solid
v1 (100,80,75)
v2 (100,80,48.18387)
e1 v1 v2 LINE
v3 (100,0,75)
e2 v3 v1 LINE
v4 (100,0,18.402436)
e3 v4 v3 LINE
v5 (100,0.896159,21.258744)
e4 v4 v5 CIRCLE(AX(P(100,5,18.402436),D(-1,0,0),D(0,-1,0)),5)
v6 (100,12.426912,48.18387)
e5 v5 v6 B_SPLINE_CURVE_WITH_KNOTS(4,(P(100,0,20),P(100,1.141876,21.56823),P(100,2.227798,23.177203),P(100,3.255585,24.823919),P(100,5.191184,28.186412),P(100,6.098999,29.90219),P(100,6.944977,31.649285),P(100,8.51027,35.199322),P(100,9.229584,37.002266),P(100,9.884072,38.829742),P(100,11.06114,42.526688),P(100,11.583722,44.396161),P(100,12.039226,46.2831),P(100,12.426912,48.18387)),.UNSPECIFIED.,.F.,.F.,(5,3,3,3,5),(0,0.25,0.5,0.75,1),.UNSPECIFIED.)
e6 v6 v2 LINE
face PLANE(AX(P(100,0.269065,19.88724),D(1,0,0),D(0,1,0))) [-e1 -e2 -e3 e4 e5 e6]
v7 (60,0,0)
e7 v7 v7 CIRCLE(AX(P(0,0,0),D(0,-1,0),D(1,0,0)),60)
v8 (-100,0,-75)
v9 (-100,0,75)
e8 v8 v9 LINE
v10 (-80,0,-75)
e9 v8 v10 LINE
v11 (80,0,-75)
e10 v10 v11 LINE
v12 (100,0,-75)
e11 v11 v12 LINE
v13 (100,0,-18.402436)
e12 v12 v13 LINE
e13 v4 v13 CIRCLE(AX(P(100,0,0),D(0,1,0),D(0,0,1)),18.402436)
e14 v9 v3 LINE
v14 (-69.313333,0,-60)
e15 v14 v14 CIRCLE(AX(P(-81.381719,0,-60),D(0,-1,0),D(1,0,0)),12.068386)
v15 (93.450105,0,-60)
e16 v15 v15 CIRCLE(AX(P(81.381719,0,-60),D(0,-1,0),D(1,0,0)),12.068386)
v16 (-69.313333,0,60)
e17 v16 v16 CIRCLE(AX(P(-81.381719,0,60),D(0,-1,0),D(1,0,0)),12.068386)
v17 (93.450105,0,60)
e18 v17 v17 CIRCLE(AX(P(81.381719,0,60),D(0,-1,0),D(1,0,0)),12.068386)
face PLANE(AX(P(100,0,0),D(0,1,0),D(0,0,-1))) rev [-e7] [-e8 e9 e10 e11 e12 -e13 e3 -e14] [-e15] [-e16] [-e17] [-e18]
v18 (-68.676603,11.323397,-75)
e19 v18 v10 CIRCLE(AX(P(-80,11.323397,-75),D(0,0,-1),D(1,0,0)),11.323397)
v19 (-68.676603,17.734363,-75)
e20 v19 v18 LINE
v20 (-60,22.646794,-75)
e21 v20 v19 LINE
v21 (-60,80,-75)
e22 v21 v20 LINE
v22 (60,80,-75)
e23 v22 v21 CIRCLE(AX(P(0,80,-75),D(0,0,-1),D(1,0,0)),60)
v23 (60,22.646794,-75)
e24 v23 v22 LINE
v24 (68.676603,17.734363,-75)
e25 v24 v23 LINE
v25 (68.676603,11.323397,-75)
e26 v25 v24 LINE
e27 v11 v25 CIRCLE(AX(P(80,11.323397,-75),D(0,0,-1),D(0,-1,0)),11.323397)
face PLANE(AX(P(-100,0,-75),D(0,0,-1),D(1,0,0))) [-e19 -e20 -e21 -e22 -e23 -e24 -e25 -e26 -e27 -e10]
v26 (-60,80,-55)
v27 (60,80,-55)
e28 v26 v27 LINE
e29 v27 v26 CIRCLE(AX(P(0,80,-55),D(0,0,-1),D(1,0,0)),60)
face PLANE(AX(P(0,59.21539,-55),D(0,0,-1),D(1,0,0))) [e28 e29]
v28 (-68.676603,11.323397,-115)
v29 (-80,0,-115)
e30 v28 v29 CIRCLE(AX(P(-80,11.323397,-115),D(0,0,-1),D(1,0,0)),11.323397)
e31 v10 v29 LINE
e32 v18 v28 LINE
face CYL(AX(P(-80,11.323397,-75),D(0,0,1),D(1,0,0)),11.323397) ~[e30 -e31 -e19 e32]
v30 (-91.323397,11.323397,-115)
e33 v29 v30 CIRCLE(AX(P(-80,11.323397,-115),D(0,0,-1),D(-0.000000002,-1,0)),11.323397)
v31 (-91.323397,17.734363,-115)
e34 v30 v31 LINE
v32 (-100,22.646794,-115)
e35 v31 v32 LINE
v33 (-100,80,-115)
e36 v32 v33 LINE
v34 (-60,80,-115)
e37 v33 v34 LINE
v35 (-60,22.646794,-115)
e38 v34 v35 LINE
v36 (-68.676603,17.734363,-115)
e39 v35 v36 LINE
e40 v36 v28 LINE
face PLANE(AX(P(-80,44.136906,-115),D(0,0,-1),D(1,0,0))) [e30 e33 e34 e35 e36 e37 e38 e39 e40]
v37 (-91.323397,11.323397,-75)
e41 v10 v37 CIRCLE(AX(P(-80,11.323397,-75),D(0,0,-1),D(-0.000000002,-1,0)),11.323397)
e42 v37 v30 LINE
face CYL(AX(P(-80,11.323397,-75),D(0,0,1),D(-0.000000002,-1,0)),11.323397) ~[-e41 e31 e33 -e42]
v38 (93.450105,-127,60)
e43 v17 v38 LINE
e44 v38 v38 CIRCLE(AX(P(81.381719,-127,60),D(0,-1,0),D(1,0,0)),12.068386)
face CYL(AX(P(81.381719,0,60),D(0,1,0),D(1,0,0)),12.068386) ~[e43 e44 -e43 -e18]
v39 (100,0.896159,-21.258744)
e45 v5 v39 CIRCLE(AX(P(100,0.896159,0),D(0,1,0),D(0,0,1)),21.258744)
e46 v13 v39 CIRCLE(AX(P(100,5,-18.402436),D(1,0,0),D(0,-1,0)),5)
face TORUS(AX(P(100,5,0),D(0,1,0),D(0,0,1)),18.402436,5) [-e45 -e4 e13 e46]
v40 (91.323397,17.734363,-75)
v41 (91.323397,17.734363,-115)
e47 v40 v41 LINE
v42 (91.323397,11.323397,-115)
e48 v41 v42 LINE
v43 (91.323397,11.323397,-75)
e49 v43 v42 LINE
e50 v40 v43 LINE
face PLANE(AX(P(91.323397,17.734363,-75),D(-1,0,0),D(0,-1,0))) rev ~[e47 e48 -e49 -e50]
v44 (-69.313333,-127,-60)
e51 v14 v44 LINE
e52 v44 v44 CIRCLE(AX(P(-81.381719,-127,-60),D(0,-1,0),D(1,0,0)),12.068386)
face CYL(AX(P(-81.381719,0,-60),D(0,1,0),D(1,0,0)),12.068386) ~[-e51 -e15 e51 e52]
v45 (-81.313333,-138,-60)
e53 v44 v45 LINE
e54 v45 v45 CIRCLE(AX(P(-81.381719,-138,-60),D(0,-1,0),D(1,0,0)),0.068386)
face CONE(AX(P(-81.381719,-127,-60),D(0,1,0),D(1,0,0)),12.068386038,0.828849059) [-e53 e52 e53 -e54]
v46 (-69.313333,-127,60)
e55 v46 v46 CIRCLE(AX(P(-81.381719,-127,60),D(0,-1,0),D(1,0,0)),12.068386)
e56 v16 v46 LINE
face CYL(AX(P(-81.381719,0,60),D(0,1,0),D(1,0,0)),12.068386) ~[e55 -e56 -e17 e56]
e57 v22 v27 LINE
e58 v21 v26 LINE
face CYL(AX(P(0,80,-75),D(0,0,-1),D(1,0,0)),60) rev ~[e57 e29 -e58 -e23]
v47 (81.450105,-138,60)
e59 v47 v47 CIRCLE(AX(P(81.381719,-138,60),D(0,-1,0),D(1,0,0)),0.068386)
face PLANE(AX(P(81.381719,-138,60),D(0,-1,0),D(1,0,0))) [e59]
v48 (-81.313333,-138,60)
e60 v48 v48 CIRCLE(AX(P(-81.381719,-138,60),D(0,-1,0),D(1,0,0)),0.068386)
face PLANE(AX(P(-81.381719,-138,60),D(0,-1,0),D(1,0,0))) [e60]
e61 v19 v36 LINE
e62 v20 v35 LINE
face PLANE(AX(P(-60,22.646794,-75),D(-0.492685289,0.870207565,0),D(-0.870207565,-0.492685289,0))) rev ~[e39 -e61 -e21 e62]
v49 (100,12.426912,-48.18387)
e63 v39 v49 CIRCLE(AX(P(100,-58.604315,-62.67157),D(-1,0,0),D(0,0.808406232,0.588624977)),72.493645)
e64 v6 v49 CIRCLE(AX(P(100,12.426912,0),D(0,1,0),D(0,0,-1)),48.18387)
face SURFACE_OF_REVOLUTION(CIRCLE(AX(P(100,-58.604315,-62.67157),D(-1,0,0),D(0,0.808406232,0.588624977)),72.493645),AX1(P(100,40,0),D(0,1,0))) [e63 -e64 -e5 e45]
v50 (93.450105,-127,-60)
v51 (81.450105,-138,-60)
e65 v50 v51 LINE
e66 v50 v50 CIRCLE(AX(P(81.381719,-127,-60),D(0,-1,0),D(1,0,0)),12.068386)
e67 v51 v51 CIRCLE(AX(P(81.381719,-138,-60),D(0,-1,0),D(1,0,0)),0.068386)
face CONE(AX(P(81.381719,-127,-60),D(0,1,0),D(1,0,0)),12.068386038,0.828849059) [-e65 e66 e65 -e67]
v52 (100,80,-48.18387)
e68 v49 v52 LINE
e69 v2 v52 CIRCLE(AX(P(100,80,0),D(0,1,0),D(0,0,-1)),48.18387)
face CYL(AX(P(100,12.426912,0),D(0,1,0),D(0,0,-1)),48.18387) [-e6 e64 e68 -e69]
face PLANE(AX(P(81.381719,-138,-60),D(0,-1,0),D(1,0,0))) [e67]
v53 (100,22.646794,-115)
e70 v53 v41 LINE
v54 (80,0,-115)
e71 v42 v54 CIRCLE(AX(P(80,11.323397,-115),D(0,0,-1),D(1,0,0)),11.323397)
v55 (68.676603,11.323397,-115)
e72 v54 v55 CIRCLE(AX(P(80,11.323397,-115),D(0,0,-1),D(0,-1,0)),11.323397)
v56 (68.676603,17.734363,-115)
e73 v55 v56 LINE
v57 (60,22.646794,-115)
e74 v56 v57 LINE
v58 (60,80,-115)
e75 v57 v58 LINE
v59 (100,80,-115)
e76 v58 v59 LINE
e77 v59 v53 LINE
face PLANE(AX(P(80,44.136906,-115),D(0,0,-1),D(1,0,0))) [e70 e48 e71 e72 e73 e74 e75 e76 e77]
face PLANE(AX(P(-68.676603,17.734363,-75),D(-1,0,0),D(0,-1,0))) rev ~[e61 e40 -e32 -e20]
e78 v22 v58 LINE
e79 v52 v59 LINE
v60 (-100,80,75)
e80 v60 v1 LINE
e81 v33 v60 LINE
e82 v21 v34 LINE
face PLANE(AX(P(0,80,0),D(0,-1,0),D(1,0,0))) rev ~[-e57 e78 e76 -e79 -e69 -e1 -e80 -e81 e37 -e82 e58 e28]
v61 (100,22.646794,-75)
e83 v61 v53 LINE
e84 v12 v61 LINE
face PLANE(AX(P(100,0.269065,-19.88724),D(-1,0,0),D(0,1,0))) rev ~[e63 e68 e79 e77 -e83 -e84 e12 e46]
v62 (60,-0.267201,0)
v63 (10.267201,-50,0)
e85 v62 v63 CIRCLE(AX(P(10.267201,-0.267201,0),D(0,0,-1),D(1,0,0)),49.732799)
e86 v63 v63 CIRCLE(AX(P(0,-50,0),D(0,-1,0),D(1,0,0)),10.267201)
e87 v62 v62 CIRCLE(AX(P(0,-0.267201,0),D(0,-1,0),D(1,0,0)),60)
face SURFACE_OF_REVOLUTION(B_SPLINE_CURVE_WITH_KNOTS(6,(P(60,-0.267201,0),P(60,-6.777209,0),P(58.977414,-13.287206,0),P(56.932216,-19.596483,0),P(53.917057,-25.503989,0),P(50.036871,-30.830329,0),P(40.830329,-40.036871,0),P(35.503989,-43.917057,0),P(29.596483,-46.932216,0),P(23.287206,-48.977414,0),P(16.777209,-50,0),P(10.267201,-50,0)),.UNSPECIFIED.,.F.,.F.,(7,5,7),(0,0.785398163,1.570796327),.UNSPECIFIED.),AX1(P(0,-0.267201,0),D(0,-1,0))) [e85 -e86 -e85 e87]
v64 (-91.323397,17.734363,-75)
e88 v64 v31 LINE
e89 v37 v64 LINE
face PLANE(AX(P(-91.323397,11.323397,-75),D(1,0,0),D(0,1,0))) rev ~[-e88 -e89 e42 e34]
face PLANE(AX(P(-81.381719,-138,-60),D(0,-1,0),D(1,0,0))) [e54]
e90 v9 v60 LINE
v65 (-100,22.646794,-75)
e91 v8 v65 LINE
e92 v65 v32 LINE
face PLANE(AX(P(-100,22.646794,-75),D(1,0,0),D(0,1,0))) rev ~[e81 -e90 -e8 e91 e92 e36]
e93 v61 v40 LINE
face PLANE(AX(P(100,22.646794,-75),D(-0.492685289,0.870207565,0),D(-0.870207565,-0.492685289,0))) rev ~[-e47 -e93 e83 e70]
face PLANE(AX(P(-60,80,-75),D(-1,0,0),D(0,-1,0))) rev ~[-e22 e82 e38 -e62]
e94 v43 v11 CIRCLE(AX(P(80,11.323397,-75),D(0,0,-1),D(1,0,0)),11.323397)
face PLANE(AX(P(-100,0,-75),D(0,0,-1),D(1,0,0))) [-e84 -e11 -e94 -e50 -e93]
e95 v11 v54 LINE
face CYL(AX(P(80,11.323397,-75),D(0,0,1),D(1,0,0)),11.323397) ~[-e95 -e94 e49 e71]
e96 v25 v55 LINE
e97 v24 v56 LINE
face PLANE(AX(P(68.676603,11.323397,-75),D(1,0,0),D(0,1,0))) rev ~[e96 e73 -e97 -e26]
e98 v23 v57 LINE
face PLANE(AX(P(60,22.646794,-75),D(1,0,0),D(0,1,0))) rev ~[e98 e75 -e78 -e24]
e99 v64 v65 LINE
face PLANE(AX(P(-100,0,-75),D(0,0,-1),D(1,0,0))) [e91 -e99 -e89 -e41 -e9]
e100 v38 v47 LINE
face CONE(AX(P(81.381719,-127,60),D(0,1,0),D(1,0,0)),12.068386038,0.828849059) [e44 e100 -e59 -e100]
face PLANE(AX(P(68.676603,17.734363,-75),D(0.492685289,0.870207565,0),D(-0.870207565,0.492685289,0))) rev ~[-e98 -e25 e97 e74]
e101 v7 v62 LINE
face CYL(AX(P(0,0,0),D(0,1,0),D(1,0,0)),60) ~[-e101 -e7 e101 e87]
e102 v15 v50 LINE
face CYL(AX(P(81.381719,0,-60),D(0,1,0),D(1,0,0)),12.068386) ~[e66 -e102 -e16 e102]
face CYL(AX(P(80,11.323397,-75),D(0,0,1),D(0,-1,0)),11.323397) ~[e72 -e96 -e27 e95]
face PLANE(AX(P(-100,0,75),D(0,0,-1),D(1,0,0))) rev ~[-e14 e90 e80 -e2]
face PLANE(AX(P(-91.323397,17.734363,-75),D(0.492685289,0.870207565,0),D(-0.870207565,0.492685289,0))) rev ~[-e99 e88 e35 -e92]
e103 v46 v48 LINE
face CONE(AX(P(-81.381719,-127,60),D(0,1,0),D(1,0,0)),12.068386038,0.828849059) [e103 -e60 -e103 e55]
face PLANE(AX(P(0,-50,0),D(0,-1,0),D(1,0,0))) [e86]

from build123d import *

# Parameters (mm, degrees)
F0_W         = 200
F0_H         = 150
F0_R         = 12.0683860383
F0_R_2       = 60
F1_DEPTH     = 80
F2_DEPTH     = 138
F3_C1_SIZE2  = 12
F3_C1_SIZE   = 11
F3_C2_SIZE2  = 12
F3_C2_SIZE   = 11
F3_C3_SIZE2  = 12
F3_C3_SIZE   = 11
F3_C4_SIZE2  = 12
F3_C4_SIZE   = 11
F4_DEPTH     = 50
F5_R         = 49.7327993849
F7_DEPTH     = 40
F8_DEPTH     = 20
F11_T2_ANGLE = 180


# Not quite as in the source:
# - a fillet or chamfer that OpenCascade refuses, or shapes differently, is made with other operations: its cross-section is extruded or revolved along the edge and cut away or added


with BuildPart() as f1:
    # F0 (on Front) → F1 (new body)
    with BuildSketch(Plane.XZ):
        Rectangle(F0_W, F0_H)
        with Locations((-81.3817187923, -60)):
            Circle(F0_R, mode=Mode.SUBTRACT)
        with Locations((81.3817187923, -60)):
            Circle(F0_R, mode=Mode.SUBTRACT)
        with Locations((-81.3817187923, 60)):
            Circle(F0_R, mode=Mode.SUBTRACT)
        Circle(F0_R_2, mode=Mode.SUBTRACT)
        with Locations((81.3817187923, 60)):
            Circle(F0_R, mode=Mode.SUBTRACT)
        Circle(F0_R_2)
        with Locations((81.3817187923, -60)):
            Circle(F0_R)
        with Locations((-81.3817187923, 60)):
            Circle(F0_R)
        with Locations((-81.3817187923, -60)):
            Circle(F0_R)
        with Locations((81.3817187923, 60)):
            Circle(F0_R)
    extrude(amount=-F1_DEPTH)

    # F0 (on Front) → F2 (join)
    with BuildSketch(Plane.XZ):
        with Locations((-81.3817187923, 60)):
            Circle(F0_R)
        with Locations((81.3817187923, 60)):
            Circle(F0_R)
        with Locations((81.3817187923, -60)):
            Circle(F0_R)
        with Locations((-81.3817187923, -60)):
            Circle(F0_R)
    extrude(amount=F2_DEPTH)

    # F3: chamfer of 12 x 11 on 4 edges, made by hand

    # F3_c1
    f3_c1_edges = [f1.edges().sort_by_distance(p)[0] for p in [
        (-93.4501048306, -138, -60),
    ]]
    f3_c1_side = f1.faces().sort_by_distance((-93.4501048306, -137.78, -60))[0]
    chamfer(f3_c1_edges, length=F3_C1_SIZE, length2=F3_C1_SIZE2, reference=f3_c1_side)

    # F3_c2
    f3_c2_edges = [f1.edges().sort_by_distance(p)[0] for p in [
        (69.313332754, -138, -60),
    ]]
    f3_c2_side = f1.faces().sort_by_distance((69.313332754, -137.78, -60))[0]
    chamfer(f3_c2_edges, length=F3_C2_SIZE, length2=F3_C2_SIZE2, reference=f3_c2_side)

    # F3_c3
    f3_c3_edges = [f1.edges().sort_by_distance(p)[0] for p in [
        (-93.4501048306, -138, 60),
    ]]
    f3_c3_side = f1.faces().sort_by_distance((-93.4501048306, -137.78, 60))[0]
    chamfer(f3_c3_edges, length=F3_C3_SIZE, length2=F3_C3_SIZE2, reference=f3_c3_side)

    # F3_c4
    f3_c4_edges = [f1.edges().sort_by_distance(p)[0] for p in [
        (69.313332754, -138, 60),
    ]]
    f3_c4_side = f1.faces().sort_by_distance((69.313332754, -137.78, 60))[0]
    chamfer(f3_c4_edges, length=F3_C4_SIZE, length2=F3_C4_SIZE2, reference=f3_c4_side)

    # F0 (on Front) → F4 (join)
    with BuildSketch(Plane.XZ):
        Circle(F0_R_2)
    extrude(amount=F4_DEPTH)

    # F5
    f5_edges = [f1.edges().sort_by_distance(p)[0] for p in [
        (-60, -50, 0),
    ]]
    fillet(f5_edges, radius=F5_R)

    # F6 (on face) → F7 (join)
    with BuildSketch(Plane(origin=(0, 0, -75), x_dir=(1, 0, 0), z_dir=(0, 0, -1))):
        with BuildLine():
            ThreePointArc((-68.6766029522, -11.3233970478), (-71.9931491676, -3.316546203), (-80.0000000175, 0))
            ThreePointArc((-80.0000000175, 0), (-88.0068508448, -3.3165462154), (-91.3233970478, -11.3233970478))
            Line((-91.3233970478, -11.3233970478), (-91.3233970478, -17.7343630829))
            Line((-91.3233970478, -17.7343630829), (-100, -22.6467940956))
            Line((-100, -22.6467940956), (-100, -80))
            Line((-100, -80), (-60, -80))
            Line((-60, -80), (-60, -22.6467940956))
            Line((-60, -22.6467940956), (-68.6766029522, -17.7343630829))
            Line((-68.6766029522, -17.7343630829), (-68.6766029522, -11.3233970478))
        make_face()
        with BuildLine():
            Line((68.6766029522, -17.7343630829), (60, -22.6467940956))
            Line((60, -22.6467940956), (60, -80))
            Line((60, -80), (100, -80))
            Line((100, -80), (100, -22.6467940956))
            Line((100, -22.6467940956), (91.3233970478, -17.7343630829))
            Line((91.3233970478, -17.7343630829), (91.3233970478, -11.3233970478))
            ThreePointArc((91.3233970478, -11.3233970478), (88.0068508386, -3.3165462092), (80, 0))
            ThreePointArc((80, 0), (71.9931491614, -3.3165462092), (68.6766029522, -11.3233970478))
            Line((68.6766029522, -11.3233970478), (68.6766029522, -17.7343630829))
        make_face()
    extrude(amount=F7_DEPTH)

    # F6 (on face) → F8 (cut)
    with BuildSketch(Plane(origin=(0, 0, -75), x_dir=(1, 0, 0), z_dir=(0, 0, -1))):
        with BuildLine():
            ThreePointArc((60, -80), (0, -20), (-60, -80))
            Line((-60, -80), (60, -80))
        make_face()
    extrude(amount=-F8_DEPTH, mode=Mode.SUBTRACT)

    # F9 (on face) → F10 (revolve)
    with BuildSketch(Plane.YZ.offset(100)):
        with BuildLine():
            Line((80, 0), (0, 0))
            Line((0, 0), (0, -20))
            ThreePointArc((0, -20), (7.7276234195, -33.4243037519), (12.4269118533, -48.1838695705))
            Line((12.4269118533, -48.1838695705), (80, -48.1838695705))
            Line((80, -48.1838695705), (80, 0))
        make_face()
    revolve(axis=Axis((100, 40, 0), (0, 1, 0)))

    # F11: fillet of radius 5 on 1 edges, made by hand

    # F11_s1 → F11_t2 (revolve, cut)
    with BuildSketch(Plane.YZ.offset(100)):
        with BuildLine():
            ThreePointArc((0, 18.4024363766), (0.2292975701, 19.8992323966), (0.8961593302, 21.2587437405))
            ThreePointArc((0.8961593302, 21.2587437405), (0.451433447, 20.6269841539), (0, 20))
            Line((0, 20), (0, 18.4024363766))
        make_face()
    revolve(axis=Axis((100, 0, 0), (0, 1, 0)), revolution_arc=F11_T2_ANGLE, mode=Mode.SUBTRACT)


solid = f1.part
